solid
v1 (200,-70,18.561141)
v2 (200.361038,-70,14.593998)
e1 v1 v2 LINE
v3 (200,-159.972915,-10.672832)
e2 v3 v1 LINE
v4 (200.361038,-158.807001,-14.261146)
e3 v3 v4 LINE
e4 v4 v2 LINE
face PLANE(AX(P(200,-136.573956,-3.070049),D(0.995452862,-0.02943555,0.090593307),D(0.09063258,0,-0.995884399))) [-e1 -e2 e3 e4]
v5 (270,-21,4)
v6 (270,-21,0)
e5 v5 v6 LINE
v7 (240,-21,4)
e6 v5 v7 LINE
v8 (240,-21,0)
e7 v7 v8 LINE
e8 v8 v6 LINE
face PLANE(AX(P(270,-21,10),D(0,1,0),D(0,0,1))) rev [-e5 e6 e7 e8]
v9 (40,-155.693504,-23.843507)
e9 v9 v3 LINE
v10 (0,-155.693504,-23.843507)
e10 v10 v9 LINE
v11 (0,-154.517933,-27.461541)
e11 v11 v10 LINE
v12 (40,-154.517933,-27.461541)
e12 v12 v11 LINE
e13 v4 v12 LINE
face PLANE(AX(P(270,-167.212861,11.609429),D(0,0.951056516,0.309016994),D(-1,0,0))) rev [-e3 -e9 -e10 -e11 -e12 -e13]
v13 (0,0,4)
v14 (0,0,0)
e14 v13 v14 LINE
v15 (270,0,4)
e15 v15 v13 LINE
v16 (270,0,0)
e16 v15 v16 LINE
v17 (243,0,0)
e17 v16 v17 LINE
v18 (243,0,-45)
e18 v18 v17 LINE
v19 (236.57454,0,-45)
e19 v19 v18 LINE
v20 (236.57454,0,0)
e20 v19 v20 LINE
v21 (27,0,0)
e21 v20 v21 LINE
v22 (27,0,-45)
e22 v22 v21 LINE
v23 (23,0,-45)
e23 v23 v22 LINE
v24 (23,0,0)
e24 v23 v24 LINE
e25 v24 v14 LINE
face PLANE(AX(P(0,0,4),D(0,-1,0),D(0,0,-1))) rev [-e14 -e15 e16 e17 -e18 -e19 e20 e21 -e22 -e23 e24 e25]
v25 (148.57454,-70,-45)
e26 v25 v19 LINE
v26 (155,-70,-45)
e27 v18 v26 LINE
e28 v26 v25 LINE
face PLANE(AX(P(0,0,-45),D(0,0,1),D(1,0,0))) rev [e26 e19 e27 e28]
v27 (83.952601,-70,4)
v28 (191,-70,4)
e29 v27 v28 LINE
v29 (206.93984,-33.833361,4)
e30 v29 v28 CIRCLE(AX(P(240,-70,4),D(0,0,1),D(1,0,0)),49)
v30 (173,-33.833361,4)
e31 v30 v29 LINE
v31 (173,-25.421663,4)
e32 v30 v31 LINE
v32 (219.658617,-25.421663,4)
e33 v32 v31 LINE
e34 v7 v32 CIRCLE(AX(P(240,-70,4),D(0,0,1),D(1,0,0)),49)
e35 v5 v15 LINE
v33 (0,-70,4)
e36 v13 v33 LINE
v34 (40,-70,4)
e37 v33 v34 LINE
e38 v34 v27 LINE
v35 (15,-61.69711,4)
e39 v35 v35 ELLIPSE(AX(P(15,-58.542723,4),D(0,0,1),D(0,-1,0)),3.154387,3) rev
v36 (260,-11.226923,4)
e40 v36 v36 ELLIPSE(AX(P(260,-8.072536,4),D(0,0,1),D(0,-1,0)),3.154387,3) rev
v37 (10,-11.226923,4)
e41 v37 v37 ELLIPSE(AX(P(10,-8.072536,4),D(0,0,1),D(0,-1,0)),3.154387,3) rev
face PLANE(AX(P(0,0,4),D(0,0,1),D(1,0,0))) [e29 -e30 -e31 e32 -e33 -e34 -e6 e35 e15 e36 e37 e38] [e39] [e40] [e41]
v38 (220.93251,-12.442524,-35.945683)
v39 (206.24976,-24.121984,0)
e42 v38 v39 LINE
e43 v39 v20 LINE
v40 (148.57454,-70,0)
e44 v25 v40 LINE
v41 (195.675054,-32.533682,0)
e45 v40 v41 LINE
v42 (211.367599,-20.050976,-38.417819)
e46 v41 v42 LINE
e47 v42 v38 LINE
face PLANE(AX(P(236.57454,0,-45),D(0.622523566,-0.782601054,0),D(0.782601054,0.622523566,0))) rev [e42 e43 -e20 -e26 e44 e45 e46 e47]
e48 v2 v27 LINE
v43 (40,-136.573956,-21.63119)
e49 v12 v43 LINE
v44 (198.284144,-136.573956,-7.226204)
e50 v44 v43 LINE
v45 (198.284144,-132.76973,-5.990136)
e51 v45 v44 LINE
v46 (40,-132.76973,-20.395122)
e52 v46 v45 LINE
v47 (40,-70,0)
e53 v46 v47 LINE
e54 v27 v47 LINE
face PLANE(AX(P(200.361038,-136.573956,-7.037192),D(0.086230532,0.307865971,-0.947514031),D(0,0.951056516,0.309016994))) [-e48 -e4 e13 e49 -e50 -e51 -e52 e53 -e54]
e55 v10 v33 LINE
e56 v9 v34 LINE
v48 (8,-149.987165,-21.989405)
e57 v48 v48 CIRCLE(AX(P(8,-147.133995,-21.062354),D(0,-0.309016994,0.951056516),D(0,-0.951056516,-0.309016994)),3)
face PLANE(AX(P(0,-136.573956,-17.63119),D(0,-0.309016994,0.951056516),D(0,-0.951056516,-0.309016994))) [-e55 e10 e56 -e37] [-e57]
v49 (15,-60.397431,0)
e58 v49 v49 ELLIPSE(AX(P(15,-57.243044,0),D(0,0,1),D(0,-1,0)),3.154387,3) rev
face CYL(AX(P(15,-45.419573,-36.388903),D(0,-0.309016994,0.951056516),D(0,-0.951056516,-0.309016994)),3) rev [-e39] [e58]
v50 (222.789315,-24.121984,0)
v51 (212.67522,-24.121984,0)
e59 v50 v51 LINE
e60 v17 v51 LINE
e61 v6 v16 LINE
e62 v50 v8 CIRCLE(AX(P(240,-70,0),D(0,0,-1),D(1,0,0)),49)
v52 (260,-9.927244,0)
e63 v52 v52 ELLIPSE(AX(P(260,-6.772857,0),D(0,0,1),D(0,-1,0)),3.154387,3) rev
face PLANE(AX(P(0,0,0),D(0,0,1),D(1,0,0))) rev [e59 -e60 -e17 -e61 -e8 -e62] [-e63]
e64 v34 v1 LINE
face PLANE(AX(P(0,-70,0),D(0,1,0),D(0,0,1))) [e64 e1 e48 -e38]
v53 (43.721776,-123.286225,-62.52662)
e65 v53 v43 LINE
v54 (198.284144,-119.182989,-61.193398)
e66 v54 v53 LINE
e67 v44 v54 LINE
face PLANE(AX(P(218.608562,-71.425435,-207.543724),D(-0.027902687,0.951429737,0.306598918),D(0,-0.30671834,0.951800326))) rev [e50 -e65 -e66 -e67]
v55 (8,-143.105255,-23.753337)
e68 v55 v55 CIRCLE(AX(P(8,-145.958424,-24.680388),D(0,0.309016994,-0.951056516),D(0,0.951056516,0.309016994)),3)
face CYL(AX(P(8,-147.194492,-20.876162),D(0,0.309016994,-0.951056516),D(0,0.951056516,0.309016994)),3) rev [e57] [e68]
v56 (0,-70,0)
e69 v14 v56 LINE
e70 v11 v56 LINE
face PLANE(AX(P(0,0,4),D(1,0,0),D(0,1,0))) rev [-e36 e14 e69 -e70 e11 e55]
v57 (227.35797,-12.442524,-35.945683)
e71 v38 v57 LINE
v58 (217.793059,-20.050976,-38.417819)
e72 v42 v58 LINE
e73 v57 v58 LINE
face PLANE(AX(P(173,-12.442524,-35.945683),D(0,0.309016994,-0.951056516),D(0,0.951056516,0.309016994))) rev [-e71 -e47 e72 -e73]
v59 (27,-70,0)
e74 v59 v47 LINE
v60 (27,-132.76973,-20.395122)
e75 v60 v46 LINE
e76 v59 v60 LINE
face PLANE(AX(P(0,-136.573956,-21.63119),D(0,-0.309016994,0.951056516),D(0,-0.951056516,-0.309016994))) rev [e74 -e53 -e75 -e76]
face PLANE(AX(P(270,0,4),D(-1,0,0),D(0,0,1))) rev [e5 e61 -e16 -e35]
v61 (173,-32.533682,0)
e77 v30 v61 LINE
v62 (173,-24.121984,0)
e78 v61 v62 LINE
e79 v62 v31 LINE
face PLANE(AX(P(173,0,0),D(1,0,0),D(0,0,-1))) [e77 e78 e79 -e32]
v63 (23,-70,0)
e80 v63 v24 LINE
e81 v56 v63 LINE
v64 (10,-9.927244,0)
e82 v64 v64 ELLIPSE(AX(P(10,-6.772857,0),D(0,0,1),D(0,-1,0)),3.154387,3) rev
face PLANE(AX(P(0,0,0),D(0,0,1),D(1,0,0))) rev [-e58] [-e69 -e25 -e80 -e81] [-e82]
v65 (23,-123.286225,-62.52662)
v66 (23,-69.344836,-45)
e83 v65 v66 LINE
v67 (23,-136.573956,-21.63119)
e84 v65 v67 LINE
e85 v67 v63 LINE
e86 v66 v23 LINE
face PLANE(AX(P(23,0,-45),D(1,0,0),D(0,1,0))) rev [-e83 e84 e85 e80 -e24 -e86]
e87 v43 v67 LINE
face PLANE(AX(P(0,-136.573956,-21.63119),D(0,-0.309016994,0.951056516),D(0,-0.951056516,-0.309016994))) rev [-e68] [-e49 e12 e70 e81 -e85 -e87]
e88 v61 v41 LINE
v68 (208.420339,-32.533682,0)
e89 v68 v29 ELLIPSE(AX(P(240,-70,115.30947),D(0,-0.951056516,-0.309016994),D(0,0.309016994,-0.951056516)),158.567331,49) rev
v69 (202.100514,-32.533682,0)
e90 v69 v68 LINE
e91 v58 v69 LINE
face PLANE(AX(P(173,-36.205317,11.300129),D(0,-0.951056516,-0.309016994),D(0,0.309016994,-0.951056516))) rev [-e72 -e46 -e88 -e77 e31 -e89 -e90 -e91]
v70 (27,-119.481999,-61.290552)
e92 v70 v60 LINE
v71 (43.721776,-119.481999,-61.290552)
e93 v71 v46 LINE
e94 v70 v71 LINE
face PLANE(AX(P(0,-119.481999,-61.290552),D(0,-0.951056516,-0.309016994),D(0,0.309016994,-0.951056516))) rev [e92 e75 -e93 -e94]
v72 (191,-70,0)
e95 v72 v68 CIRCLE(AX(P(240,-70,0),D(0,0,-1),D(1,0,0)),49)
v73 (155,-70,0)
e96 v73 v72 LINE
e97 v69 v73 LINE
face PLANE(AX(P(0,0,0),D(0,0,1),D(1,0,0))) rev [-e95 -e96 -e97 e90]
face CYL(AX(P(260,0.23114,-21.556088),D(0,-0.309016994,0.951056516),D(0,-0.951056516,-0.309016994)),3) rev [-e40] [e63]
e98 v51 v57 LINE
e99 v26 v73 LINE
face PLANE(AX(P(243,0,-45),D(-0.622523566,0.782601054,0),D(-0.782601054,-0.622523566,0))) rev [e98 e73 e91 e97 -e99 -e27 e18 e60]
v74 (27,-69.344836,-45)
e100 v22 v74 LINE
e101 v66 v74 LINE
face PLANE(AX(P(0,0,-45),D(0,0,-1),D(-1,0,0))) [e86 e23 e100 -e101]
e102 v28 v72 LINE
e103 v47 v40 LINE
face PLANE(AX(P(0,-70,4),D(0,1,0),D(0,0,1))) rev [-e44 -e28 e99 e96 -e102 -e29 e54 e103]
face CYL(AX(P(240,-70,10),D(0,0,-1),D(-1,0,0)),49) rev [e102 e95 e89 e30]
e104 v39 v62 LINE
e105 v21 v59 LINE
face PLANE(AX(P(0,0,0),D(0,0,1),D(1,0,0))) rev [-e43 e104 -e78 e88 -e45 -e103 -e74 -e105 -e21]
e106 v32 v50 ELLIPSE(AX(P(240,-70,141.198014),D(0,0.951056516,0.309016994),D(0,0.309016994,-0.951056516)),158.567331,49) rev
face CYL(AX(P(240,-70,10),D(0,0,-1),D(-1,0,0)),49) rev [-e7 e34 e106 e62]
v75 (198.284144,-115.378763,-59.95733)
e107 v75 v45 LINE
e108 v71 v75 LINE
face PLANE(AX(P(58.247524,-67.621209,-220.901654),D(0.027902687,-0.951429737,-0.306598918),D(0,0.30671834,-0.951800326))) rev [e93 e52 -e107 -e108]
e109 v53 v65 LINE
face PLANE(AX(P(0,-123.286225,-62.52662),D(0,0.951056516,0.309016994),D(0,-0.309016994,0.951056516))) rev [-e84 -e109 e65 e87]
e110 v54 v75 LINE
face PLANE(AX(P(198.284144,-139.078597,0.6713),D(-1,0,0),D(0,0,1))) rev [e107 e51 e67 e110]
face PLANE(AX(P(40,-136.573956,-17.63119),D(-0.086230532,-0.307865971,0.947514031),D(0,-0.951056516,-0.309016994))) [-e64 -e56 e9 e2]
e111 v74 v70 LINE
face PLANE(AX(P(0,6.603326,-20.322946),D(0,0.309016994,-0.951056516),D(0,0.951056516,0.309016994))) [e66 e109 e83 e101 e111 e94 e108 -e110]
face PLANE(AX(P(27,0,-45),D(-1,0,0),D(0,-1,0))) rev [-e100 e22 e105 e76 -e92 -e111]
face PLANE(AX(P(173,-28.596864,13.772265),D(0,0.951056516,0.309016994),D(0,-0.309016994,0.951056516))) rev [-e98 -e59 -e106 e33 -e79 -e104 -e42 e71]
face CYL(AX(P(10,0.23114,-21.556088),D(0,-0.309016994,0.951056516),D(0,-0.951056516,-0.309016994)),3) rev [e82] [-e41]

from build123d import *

# Parameters (mm, degrees)
SKETCH1_W               = 270
SKETCH1_H               = 70
BOSS_EXTRUDE1_DEPTH     = 4
BOSS_EXTRUDE4_DEPTH     = 70
SKETCH7_R               = 3
CUT_EXTRUDE1_DEPTH      = 304.970702227
CUT_EXTRUDE2_DEPTH      = 10
SKETCH9_W               = 4
SKETCH9_H               = 70
BOSS_EXTRUDE5_DEPTH     = 45
SKETCH10_W              = 13
SKETCH10_H              = 4
BOSS_EXTRUDE6_DEPTH     = 43
BOSS_EXTRUDE7_REACH     = 313.858
BOSS_EXTRUDE8_REACH     = 276.704
BOSS_EXTRUDE9_START     = -155.441370069
BOSS_EXTRUDE9_DEPTH     = 24.603121834
SKETCH14_R              = 3
CUT_EXTRUDE3_DEPTH      = 4
CUT_EXTRUDE4_REACH      = 322.045
SKETCH15_W              = 7
SKETCH15_H              = 3.80460454
CUT_EXTRUDE5_DEPTH      = 10
CUT_EXTRUDE5_DEPTH_BACK = 304.645223857
CUT_EXTRUDE6_DEPTH      = 70


# Read off the part's stored shape, not the designer's step: Boss-Extrude9
with BuildPart() as part:
    # Sketch1 → Boss-Extrude1 (new body)
    with BuildSketch(Plane.XY):
        with Locations((135, -35)):
            Rectangle(SKETCH1_W, SKETCH1_H)
    extrude(amount=BOSS_EXTRUDE1_DEPTH)


with BuildPart() as body_2:
    # Mirror1: mirrored copy
    add(part.part.mirror(Plane(origin=(135, 0, 0), x_dir=(0, 0, 1), z_dir=(1, 0, 0))))


with BuildPart() as part_1:
    add(part.part)

    add(body_2.part)  # Boss-Extrude4 merges body 2
    # Sketch2 → Boss-Extrude4 (add, along a direction that is not the sketch's normal)
    with BuildSketch(Plane.XZ.offset(70)):
        Polygon((200.361038291, 14.593997741), (40, 0), (0, 0), (0, 4), (40, 4), (200, 18.561140682), align=None)
    extrude(amount=BOSS_EXTRUDE4_DEPTH, dir=(0, -0.9510565162951534, -0.30901699437494823))

    # Sketch7 → Cut-Extrude1 (cut, through all)
    with BuildSketch(Plane(origin=(0, -15.671129003, 48.230775743), x_dir=(-1, 0, 0), z_dir=(0, 0.3090169943749448, -0.9510565162951545))):
        with Locations((-8, -146.441370146)):
            Circle(SKETCH7_R)
        with Locations(Location((-15, -54.441370146, 0), (0, 0, 270))):
            Circle(SKETCH7_R)
        with Locations(Location((-255, -54.441370146, 0), (0, 0, 270))):
            Circle(SKETCH7_R)
        with Locations((-262, -146.441370146)):
            Circle(SKETCH7_R)
        with Locations(Location((-10, -6.441370146, 0), (0, 0, 270))):
            Circle(SKETCH7_R)
        with Locations(Location((-260, -6.441370146, 0), (0, 0, 270))):
            Circle(SKETCH7_R)
    extrude(amount=CUT_EXTRUDE1_DEPTH, mode=Mode.SUBTRACT)

    # Sketch8 → Cut-Extrude2 (cut)
    with BuildSketch(Plane(origin=(0, 0, 0), x_dir=(-1, 0, 0), z_dir=(0, 0, -1))):
        with BuildLine():
            Line((-270, -70), (-270, -21))
            Line((-270, -21), (-240, -21))
            ThreePointArc((-240, -21), (-205.351767722, -35.351767722), (-191, -70))
            Line((-191, -70), (-270, -70))
        make_face()
    extrude(amount=-CUT_EXTRUDE2_DEPTH, mode=Mode.SUBTRACT)

    # Sketch9 → Boss-Extrude5 (add)
    with BuildSketch(Plane(origin=(0, 0, 0), x_dir=(-1, 0, 0), z_dir=(0, 0, -1))):
        Polygon((-243, 0), (-155, -70), (-148.574540436, -70), (-152.509905737, -66.869595783), (-236.574540436, 0), align=None)
        with Locations((-25, -35)):
            Rectangle(SKETCH9_W, SKETCH9_H)
    extrude(amount=BOSS_EXTRUDE5_DEPTH)

    # Sketch10 → Boss-Extrude6 (add)
    with BuildSketch(Plane(origin=(0, -6.684405197, 20.57248383), x_dir=(-1, 0, 0), z_dir=(0, 0.3090169943749482, -0.9510565162951534))):
        with Locations((-33.5, -134.573956141)):
            Rectangle(SKETCH10_W, SKETCH10_H)
        Polygon((-23, -66.573956141), (-27, -66.573956141), (-27, -132.573956141), (-27, -136.573956141), (-23, -136.573956141), align=None)
    extrude(amount=BOSS_EXTRUDE6_DEPTH)

    # Boss-Extrude7: up to this plane
    boss_extrude7_end = Plane(origin=(0, 6.603325561, -20.32294637), z_dir=(0, 0.30901699437494823, -0.9510565162951534))
    # Sketch11 → Boss-Extrude7 (add, up to the surface)
    with BuildSketch(Plane(origin=(-1.560893066, -5.572804076, 17.151327361), x_dir=(-0.9962752106554099, 0.026646699794247903, -0.08201010927680777), z_dir=(0.08623053191021567, 0.30786597116700337, -0.947514031117154)), mode=Mode.PRIVATE) as boss_extrude7_sk1:
        Polygon((-41.716277412, -132.573956141), (-202.676859965, -128.064162823), (-202.676859965, -132.064162823), (-41.716277412, -136.573956141), align=None)
    boss_extrude7_tool1 = split(extrude(boss_extrude7_sk1.sketch, amount=BOSS_EXTRUDE7_REACH, mode=Mode.PRIVATE), bisect_by=boss_extrude7_end, keep=Keep.BOTH, mode=Mode.PRIVATE)
    add(boss_extrude7_tool1.solids().sort_by_distance((120.180519, -134.671843, -13.716157))[0])

    # Boss-Extrude8: up to this face of the body (flat: up to its plane)
    boss_extrude8_end = Plane(part_1.part.faces().sort_by_distance((41.860887851, -128.027977729, -41.460870718))[0])
    # Sketch12 → Boss-Extrude8 (add, up to the picked face)
    with BuildSketch(Plane(origin=(40, 0, 0), x_dir=(0, 0, -1), z_dir=(1, 0, 0)), mode=Mode.PRIVATE) as boss_extrude8_sk1:
        Polygon((20.395121629, -132.769730075), (21.631189606, -136.573956141), (62.526619807, -123.286225383), (61.290551829, -119.481999317), align=None)
    boss_extrude8_tool1 = split(extrude(boss_extrude8_sk1.sketch, amount=BOSS_EXTRUDE8_REACH, mode=Mode.PRIVATE), bisect_by=boss_extrude8_end, keep=Keep.BOTH, mode=Mode.PRIVATE)
    add(boss_extrude8_tool1.solids().sort_by(Axis((40, -128.027978, -41.460871), (1, 0, 0)))[0])

    # Boss-Extrude9 outline → Boss-Extrude9 (add)
    with BuildSketch(Plane(origin=(0, 0, 0), x_dir=(1, 0, 0), z_dir=(0, 0.9510565162951545, 0.3090169943749449)).offset(BOSS_EXTRUDE9_START)):
        Polygon((200.361038291, -35.510906256), (40, -21.631189606), (0, -21.631189606), (0, -25.435415671), (40, -25.435415671), (200, -39.283883402), align=None)
    extrude(amount=BOSS_EXTRUDE9_DEPTH)

    # Sketch14 → Cut-Extrude3 (cut)
    with BuildSketch(Plane(origin=(0, -6.684405197, 20.57248383), x_dir=(-1, 0, 0), z_dir=(0, 0.3090169943749481, -0.9510565162951534))):
        with Locations(Location((-8, -146.441370069, 0), (0, 0, 90))):
            Circle(SKETCH14_R)
    extrude(amount=-CUT_EXTRUDE3_DEPTH, mode=Mode.SUBTRACT)

    # Cut-Extrude4: up to this plane
    cut_extrude4_end = Plane(origin=(200.361038291, -136.573956141, -7.037191865), z_dir=(0.08623053191021565, 0.3078659711670031, -0.9475140311171542))
    # Sketch15 → Cut-Extrude4 (cut, up to the surface)
    with BuildSketch(Plane(origin=(0, 6.603325561, -20.32294637), x_dir=(-1, 0, 0), z_dir=(0, 0.3090169943749483, -0.9510565162951534)), mode=Mode.PRIVATE) as cut_extrude4_sk1:
        with Locations((-201.784144044, -130.161860553)):
            Rectangle(SKETCH15_W, SKETCH15_H)
    cut_extrude4_tool1 = split(extrude(cut_extrude4_sk1.sketch, amount=-CUT_EXTRUDE4_REACH, mode=Mode.PRIVATE), bisect_by=cut_extrude4_end, keep=Keep.BOTH, mode=Mode.PRIVATE)
    add(cut_extrude4_tool1.solids().sort_by_distance((201.784144, -117.18796, -60.545173))[0], mode=Mode.SUBTRACT)

    # Sketch16 → Cut-Extrude5 (cut, two sides: drawn at the far end of the back side and taken through both)
    with BuildSketch(Plane(origin=(0, -125.600482622, -40.81007066), x_dir=(1, 0, 0), z_dir=(0, 0.9510565162951534, 0.3090169943749483)).offset(-CUT_EXTRUDE5_DEPTH_BACK)):
        Polygon((205.284144044, 21.368810394), (198.284144044, 21.368810394), (198.284144044, -35.331144988), (200.361038291, -35.510906256), align=None)
    extrude(amount=CUT_EXTRUDE5_DEPTH + CUT_EXTRUDE5_DEPTH_BACK, mode=Mode.SUBTRACT)

    # Sketch17 → Cut-Extrude6 (cut)
    with BuildSketch(Plane(origin=(243, 0, 0), x_dir=(0, 0, -1), z_dir=(1, 0, 0))):
        Polygon((-13.772265004, -28.596864407), (35.94568304, -12.442523831), (38.417818995, -20.050975962), (-11.300129049, -36.205316538), align=None)
    extrude(amount=-CUT_EXTRUDE6_DEPTH, mode=Mode.SUBTRACT)


solid = part_1.part
